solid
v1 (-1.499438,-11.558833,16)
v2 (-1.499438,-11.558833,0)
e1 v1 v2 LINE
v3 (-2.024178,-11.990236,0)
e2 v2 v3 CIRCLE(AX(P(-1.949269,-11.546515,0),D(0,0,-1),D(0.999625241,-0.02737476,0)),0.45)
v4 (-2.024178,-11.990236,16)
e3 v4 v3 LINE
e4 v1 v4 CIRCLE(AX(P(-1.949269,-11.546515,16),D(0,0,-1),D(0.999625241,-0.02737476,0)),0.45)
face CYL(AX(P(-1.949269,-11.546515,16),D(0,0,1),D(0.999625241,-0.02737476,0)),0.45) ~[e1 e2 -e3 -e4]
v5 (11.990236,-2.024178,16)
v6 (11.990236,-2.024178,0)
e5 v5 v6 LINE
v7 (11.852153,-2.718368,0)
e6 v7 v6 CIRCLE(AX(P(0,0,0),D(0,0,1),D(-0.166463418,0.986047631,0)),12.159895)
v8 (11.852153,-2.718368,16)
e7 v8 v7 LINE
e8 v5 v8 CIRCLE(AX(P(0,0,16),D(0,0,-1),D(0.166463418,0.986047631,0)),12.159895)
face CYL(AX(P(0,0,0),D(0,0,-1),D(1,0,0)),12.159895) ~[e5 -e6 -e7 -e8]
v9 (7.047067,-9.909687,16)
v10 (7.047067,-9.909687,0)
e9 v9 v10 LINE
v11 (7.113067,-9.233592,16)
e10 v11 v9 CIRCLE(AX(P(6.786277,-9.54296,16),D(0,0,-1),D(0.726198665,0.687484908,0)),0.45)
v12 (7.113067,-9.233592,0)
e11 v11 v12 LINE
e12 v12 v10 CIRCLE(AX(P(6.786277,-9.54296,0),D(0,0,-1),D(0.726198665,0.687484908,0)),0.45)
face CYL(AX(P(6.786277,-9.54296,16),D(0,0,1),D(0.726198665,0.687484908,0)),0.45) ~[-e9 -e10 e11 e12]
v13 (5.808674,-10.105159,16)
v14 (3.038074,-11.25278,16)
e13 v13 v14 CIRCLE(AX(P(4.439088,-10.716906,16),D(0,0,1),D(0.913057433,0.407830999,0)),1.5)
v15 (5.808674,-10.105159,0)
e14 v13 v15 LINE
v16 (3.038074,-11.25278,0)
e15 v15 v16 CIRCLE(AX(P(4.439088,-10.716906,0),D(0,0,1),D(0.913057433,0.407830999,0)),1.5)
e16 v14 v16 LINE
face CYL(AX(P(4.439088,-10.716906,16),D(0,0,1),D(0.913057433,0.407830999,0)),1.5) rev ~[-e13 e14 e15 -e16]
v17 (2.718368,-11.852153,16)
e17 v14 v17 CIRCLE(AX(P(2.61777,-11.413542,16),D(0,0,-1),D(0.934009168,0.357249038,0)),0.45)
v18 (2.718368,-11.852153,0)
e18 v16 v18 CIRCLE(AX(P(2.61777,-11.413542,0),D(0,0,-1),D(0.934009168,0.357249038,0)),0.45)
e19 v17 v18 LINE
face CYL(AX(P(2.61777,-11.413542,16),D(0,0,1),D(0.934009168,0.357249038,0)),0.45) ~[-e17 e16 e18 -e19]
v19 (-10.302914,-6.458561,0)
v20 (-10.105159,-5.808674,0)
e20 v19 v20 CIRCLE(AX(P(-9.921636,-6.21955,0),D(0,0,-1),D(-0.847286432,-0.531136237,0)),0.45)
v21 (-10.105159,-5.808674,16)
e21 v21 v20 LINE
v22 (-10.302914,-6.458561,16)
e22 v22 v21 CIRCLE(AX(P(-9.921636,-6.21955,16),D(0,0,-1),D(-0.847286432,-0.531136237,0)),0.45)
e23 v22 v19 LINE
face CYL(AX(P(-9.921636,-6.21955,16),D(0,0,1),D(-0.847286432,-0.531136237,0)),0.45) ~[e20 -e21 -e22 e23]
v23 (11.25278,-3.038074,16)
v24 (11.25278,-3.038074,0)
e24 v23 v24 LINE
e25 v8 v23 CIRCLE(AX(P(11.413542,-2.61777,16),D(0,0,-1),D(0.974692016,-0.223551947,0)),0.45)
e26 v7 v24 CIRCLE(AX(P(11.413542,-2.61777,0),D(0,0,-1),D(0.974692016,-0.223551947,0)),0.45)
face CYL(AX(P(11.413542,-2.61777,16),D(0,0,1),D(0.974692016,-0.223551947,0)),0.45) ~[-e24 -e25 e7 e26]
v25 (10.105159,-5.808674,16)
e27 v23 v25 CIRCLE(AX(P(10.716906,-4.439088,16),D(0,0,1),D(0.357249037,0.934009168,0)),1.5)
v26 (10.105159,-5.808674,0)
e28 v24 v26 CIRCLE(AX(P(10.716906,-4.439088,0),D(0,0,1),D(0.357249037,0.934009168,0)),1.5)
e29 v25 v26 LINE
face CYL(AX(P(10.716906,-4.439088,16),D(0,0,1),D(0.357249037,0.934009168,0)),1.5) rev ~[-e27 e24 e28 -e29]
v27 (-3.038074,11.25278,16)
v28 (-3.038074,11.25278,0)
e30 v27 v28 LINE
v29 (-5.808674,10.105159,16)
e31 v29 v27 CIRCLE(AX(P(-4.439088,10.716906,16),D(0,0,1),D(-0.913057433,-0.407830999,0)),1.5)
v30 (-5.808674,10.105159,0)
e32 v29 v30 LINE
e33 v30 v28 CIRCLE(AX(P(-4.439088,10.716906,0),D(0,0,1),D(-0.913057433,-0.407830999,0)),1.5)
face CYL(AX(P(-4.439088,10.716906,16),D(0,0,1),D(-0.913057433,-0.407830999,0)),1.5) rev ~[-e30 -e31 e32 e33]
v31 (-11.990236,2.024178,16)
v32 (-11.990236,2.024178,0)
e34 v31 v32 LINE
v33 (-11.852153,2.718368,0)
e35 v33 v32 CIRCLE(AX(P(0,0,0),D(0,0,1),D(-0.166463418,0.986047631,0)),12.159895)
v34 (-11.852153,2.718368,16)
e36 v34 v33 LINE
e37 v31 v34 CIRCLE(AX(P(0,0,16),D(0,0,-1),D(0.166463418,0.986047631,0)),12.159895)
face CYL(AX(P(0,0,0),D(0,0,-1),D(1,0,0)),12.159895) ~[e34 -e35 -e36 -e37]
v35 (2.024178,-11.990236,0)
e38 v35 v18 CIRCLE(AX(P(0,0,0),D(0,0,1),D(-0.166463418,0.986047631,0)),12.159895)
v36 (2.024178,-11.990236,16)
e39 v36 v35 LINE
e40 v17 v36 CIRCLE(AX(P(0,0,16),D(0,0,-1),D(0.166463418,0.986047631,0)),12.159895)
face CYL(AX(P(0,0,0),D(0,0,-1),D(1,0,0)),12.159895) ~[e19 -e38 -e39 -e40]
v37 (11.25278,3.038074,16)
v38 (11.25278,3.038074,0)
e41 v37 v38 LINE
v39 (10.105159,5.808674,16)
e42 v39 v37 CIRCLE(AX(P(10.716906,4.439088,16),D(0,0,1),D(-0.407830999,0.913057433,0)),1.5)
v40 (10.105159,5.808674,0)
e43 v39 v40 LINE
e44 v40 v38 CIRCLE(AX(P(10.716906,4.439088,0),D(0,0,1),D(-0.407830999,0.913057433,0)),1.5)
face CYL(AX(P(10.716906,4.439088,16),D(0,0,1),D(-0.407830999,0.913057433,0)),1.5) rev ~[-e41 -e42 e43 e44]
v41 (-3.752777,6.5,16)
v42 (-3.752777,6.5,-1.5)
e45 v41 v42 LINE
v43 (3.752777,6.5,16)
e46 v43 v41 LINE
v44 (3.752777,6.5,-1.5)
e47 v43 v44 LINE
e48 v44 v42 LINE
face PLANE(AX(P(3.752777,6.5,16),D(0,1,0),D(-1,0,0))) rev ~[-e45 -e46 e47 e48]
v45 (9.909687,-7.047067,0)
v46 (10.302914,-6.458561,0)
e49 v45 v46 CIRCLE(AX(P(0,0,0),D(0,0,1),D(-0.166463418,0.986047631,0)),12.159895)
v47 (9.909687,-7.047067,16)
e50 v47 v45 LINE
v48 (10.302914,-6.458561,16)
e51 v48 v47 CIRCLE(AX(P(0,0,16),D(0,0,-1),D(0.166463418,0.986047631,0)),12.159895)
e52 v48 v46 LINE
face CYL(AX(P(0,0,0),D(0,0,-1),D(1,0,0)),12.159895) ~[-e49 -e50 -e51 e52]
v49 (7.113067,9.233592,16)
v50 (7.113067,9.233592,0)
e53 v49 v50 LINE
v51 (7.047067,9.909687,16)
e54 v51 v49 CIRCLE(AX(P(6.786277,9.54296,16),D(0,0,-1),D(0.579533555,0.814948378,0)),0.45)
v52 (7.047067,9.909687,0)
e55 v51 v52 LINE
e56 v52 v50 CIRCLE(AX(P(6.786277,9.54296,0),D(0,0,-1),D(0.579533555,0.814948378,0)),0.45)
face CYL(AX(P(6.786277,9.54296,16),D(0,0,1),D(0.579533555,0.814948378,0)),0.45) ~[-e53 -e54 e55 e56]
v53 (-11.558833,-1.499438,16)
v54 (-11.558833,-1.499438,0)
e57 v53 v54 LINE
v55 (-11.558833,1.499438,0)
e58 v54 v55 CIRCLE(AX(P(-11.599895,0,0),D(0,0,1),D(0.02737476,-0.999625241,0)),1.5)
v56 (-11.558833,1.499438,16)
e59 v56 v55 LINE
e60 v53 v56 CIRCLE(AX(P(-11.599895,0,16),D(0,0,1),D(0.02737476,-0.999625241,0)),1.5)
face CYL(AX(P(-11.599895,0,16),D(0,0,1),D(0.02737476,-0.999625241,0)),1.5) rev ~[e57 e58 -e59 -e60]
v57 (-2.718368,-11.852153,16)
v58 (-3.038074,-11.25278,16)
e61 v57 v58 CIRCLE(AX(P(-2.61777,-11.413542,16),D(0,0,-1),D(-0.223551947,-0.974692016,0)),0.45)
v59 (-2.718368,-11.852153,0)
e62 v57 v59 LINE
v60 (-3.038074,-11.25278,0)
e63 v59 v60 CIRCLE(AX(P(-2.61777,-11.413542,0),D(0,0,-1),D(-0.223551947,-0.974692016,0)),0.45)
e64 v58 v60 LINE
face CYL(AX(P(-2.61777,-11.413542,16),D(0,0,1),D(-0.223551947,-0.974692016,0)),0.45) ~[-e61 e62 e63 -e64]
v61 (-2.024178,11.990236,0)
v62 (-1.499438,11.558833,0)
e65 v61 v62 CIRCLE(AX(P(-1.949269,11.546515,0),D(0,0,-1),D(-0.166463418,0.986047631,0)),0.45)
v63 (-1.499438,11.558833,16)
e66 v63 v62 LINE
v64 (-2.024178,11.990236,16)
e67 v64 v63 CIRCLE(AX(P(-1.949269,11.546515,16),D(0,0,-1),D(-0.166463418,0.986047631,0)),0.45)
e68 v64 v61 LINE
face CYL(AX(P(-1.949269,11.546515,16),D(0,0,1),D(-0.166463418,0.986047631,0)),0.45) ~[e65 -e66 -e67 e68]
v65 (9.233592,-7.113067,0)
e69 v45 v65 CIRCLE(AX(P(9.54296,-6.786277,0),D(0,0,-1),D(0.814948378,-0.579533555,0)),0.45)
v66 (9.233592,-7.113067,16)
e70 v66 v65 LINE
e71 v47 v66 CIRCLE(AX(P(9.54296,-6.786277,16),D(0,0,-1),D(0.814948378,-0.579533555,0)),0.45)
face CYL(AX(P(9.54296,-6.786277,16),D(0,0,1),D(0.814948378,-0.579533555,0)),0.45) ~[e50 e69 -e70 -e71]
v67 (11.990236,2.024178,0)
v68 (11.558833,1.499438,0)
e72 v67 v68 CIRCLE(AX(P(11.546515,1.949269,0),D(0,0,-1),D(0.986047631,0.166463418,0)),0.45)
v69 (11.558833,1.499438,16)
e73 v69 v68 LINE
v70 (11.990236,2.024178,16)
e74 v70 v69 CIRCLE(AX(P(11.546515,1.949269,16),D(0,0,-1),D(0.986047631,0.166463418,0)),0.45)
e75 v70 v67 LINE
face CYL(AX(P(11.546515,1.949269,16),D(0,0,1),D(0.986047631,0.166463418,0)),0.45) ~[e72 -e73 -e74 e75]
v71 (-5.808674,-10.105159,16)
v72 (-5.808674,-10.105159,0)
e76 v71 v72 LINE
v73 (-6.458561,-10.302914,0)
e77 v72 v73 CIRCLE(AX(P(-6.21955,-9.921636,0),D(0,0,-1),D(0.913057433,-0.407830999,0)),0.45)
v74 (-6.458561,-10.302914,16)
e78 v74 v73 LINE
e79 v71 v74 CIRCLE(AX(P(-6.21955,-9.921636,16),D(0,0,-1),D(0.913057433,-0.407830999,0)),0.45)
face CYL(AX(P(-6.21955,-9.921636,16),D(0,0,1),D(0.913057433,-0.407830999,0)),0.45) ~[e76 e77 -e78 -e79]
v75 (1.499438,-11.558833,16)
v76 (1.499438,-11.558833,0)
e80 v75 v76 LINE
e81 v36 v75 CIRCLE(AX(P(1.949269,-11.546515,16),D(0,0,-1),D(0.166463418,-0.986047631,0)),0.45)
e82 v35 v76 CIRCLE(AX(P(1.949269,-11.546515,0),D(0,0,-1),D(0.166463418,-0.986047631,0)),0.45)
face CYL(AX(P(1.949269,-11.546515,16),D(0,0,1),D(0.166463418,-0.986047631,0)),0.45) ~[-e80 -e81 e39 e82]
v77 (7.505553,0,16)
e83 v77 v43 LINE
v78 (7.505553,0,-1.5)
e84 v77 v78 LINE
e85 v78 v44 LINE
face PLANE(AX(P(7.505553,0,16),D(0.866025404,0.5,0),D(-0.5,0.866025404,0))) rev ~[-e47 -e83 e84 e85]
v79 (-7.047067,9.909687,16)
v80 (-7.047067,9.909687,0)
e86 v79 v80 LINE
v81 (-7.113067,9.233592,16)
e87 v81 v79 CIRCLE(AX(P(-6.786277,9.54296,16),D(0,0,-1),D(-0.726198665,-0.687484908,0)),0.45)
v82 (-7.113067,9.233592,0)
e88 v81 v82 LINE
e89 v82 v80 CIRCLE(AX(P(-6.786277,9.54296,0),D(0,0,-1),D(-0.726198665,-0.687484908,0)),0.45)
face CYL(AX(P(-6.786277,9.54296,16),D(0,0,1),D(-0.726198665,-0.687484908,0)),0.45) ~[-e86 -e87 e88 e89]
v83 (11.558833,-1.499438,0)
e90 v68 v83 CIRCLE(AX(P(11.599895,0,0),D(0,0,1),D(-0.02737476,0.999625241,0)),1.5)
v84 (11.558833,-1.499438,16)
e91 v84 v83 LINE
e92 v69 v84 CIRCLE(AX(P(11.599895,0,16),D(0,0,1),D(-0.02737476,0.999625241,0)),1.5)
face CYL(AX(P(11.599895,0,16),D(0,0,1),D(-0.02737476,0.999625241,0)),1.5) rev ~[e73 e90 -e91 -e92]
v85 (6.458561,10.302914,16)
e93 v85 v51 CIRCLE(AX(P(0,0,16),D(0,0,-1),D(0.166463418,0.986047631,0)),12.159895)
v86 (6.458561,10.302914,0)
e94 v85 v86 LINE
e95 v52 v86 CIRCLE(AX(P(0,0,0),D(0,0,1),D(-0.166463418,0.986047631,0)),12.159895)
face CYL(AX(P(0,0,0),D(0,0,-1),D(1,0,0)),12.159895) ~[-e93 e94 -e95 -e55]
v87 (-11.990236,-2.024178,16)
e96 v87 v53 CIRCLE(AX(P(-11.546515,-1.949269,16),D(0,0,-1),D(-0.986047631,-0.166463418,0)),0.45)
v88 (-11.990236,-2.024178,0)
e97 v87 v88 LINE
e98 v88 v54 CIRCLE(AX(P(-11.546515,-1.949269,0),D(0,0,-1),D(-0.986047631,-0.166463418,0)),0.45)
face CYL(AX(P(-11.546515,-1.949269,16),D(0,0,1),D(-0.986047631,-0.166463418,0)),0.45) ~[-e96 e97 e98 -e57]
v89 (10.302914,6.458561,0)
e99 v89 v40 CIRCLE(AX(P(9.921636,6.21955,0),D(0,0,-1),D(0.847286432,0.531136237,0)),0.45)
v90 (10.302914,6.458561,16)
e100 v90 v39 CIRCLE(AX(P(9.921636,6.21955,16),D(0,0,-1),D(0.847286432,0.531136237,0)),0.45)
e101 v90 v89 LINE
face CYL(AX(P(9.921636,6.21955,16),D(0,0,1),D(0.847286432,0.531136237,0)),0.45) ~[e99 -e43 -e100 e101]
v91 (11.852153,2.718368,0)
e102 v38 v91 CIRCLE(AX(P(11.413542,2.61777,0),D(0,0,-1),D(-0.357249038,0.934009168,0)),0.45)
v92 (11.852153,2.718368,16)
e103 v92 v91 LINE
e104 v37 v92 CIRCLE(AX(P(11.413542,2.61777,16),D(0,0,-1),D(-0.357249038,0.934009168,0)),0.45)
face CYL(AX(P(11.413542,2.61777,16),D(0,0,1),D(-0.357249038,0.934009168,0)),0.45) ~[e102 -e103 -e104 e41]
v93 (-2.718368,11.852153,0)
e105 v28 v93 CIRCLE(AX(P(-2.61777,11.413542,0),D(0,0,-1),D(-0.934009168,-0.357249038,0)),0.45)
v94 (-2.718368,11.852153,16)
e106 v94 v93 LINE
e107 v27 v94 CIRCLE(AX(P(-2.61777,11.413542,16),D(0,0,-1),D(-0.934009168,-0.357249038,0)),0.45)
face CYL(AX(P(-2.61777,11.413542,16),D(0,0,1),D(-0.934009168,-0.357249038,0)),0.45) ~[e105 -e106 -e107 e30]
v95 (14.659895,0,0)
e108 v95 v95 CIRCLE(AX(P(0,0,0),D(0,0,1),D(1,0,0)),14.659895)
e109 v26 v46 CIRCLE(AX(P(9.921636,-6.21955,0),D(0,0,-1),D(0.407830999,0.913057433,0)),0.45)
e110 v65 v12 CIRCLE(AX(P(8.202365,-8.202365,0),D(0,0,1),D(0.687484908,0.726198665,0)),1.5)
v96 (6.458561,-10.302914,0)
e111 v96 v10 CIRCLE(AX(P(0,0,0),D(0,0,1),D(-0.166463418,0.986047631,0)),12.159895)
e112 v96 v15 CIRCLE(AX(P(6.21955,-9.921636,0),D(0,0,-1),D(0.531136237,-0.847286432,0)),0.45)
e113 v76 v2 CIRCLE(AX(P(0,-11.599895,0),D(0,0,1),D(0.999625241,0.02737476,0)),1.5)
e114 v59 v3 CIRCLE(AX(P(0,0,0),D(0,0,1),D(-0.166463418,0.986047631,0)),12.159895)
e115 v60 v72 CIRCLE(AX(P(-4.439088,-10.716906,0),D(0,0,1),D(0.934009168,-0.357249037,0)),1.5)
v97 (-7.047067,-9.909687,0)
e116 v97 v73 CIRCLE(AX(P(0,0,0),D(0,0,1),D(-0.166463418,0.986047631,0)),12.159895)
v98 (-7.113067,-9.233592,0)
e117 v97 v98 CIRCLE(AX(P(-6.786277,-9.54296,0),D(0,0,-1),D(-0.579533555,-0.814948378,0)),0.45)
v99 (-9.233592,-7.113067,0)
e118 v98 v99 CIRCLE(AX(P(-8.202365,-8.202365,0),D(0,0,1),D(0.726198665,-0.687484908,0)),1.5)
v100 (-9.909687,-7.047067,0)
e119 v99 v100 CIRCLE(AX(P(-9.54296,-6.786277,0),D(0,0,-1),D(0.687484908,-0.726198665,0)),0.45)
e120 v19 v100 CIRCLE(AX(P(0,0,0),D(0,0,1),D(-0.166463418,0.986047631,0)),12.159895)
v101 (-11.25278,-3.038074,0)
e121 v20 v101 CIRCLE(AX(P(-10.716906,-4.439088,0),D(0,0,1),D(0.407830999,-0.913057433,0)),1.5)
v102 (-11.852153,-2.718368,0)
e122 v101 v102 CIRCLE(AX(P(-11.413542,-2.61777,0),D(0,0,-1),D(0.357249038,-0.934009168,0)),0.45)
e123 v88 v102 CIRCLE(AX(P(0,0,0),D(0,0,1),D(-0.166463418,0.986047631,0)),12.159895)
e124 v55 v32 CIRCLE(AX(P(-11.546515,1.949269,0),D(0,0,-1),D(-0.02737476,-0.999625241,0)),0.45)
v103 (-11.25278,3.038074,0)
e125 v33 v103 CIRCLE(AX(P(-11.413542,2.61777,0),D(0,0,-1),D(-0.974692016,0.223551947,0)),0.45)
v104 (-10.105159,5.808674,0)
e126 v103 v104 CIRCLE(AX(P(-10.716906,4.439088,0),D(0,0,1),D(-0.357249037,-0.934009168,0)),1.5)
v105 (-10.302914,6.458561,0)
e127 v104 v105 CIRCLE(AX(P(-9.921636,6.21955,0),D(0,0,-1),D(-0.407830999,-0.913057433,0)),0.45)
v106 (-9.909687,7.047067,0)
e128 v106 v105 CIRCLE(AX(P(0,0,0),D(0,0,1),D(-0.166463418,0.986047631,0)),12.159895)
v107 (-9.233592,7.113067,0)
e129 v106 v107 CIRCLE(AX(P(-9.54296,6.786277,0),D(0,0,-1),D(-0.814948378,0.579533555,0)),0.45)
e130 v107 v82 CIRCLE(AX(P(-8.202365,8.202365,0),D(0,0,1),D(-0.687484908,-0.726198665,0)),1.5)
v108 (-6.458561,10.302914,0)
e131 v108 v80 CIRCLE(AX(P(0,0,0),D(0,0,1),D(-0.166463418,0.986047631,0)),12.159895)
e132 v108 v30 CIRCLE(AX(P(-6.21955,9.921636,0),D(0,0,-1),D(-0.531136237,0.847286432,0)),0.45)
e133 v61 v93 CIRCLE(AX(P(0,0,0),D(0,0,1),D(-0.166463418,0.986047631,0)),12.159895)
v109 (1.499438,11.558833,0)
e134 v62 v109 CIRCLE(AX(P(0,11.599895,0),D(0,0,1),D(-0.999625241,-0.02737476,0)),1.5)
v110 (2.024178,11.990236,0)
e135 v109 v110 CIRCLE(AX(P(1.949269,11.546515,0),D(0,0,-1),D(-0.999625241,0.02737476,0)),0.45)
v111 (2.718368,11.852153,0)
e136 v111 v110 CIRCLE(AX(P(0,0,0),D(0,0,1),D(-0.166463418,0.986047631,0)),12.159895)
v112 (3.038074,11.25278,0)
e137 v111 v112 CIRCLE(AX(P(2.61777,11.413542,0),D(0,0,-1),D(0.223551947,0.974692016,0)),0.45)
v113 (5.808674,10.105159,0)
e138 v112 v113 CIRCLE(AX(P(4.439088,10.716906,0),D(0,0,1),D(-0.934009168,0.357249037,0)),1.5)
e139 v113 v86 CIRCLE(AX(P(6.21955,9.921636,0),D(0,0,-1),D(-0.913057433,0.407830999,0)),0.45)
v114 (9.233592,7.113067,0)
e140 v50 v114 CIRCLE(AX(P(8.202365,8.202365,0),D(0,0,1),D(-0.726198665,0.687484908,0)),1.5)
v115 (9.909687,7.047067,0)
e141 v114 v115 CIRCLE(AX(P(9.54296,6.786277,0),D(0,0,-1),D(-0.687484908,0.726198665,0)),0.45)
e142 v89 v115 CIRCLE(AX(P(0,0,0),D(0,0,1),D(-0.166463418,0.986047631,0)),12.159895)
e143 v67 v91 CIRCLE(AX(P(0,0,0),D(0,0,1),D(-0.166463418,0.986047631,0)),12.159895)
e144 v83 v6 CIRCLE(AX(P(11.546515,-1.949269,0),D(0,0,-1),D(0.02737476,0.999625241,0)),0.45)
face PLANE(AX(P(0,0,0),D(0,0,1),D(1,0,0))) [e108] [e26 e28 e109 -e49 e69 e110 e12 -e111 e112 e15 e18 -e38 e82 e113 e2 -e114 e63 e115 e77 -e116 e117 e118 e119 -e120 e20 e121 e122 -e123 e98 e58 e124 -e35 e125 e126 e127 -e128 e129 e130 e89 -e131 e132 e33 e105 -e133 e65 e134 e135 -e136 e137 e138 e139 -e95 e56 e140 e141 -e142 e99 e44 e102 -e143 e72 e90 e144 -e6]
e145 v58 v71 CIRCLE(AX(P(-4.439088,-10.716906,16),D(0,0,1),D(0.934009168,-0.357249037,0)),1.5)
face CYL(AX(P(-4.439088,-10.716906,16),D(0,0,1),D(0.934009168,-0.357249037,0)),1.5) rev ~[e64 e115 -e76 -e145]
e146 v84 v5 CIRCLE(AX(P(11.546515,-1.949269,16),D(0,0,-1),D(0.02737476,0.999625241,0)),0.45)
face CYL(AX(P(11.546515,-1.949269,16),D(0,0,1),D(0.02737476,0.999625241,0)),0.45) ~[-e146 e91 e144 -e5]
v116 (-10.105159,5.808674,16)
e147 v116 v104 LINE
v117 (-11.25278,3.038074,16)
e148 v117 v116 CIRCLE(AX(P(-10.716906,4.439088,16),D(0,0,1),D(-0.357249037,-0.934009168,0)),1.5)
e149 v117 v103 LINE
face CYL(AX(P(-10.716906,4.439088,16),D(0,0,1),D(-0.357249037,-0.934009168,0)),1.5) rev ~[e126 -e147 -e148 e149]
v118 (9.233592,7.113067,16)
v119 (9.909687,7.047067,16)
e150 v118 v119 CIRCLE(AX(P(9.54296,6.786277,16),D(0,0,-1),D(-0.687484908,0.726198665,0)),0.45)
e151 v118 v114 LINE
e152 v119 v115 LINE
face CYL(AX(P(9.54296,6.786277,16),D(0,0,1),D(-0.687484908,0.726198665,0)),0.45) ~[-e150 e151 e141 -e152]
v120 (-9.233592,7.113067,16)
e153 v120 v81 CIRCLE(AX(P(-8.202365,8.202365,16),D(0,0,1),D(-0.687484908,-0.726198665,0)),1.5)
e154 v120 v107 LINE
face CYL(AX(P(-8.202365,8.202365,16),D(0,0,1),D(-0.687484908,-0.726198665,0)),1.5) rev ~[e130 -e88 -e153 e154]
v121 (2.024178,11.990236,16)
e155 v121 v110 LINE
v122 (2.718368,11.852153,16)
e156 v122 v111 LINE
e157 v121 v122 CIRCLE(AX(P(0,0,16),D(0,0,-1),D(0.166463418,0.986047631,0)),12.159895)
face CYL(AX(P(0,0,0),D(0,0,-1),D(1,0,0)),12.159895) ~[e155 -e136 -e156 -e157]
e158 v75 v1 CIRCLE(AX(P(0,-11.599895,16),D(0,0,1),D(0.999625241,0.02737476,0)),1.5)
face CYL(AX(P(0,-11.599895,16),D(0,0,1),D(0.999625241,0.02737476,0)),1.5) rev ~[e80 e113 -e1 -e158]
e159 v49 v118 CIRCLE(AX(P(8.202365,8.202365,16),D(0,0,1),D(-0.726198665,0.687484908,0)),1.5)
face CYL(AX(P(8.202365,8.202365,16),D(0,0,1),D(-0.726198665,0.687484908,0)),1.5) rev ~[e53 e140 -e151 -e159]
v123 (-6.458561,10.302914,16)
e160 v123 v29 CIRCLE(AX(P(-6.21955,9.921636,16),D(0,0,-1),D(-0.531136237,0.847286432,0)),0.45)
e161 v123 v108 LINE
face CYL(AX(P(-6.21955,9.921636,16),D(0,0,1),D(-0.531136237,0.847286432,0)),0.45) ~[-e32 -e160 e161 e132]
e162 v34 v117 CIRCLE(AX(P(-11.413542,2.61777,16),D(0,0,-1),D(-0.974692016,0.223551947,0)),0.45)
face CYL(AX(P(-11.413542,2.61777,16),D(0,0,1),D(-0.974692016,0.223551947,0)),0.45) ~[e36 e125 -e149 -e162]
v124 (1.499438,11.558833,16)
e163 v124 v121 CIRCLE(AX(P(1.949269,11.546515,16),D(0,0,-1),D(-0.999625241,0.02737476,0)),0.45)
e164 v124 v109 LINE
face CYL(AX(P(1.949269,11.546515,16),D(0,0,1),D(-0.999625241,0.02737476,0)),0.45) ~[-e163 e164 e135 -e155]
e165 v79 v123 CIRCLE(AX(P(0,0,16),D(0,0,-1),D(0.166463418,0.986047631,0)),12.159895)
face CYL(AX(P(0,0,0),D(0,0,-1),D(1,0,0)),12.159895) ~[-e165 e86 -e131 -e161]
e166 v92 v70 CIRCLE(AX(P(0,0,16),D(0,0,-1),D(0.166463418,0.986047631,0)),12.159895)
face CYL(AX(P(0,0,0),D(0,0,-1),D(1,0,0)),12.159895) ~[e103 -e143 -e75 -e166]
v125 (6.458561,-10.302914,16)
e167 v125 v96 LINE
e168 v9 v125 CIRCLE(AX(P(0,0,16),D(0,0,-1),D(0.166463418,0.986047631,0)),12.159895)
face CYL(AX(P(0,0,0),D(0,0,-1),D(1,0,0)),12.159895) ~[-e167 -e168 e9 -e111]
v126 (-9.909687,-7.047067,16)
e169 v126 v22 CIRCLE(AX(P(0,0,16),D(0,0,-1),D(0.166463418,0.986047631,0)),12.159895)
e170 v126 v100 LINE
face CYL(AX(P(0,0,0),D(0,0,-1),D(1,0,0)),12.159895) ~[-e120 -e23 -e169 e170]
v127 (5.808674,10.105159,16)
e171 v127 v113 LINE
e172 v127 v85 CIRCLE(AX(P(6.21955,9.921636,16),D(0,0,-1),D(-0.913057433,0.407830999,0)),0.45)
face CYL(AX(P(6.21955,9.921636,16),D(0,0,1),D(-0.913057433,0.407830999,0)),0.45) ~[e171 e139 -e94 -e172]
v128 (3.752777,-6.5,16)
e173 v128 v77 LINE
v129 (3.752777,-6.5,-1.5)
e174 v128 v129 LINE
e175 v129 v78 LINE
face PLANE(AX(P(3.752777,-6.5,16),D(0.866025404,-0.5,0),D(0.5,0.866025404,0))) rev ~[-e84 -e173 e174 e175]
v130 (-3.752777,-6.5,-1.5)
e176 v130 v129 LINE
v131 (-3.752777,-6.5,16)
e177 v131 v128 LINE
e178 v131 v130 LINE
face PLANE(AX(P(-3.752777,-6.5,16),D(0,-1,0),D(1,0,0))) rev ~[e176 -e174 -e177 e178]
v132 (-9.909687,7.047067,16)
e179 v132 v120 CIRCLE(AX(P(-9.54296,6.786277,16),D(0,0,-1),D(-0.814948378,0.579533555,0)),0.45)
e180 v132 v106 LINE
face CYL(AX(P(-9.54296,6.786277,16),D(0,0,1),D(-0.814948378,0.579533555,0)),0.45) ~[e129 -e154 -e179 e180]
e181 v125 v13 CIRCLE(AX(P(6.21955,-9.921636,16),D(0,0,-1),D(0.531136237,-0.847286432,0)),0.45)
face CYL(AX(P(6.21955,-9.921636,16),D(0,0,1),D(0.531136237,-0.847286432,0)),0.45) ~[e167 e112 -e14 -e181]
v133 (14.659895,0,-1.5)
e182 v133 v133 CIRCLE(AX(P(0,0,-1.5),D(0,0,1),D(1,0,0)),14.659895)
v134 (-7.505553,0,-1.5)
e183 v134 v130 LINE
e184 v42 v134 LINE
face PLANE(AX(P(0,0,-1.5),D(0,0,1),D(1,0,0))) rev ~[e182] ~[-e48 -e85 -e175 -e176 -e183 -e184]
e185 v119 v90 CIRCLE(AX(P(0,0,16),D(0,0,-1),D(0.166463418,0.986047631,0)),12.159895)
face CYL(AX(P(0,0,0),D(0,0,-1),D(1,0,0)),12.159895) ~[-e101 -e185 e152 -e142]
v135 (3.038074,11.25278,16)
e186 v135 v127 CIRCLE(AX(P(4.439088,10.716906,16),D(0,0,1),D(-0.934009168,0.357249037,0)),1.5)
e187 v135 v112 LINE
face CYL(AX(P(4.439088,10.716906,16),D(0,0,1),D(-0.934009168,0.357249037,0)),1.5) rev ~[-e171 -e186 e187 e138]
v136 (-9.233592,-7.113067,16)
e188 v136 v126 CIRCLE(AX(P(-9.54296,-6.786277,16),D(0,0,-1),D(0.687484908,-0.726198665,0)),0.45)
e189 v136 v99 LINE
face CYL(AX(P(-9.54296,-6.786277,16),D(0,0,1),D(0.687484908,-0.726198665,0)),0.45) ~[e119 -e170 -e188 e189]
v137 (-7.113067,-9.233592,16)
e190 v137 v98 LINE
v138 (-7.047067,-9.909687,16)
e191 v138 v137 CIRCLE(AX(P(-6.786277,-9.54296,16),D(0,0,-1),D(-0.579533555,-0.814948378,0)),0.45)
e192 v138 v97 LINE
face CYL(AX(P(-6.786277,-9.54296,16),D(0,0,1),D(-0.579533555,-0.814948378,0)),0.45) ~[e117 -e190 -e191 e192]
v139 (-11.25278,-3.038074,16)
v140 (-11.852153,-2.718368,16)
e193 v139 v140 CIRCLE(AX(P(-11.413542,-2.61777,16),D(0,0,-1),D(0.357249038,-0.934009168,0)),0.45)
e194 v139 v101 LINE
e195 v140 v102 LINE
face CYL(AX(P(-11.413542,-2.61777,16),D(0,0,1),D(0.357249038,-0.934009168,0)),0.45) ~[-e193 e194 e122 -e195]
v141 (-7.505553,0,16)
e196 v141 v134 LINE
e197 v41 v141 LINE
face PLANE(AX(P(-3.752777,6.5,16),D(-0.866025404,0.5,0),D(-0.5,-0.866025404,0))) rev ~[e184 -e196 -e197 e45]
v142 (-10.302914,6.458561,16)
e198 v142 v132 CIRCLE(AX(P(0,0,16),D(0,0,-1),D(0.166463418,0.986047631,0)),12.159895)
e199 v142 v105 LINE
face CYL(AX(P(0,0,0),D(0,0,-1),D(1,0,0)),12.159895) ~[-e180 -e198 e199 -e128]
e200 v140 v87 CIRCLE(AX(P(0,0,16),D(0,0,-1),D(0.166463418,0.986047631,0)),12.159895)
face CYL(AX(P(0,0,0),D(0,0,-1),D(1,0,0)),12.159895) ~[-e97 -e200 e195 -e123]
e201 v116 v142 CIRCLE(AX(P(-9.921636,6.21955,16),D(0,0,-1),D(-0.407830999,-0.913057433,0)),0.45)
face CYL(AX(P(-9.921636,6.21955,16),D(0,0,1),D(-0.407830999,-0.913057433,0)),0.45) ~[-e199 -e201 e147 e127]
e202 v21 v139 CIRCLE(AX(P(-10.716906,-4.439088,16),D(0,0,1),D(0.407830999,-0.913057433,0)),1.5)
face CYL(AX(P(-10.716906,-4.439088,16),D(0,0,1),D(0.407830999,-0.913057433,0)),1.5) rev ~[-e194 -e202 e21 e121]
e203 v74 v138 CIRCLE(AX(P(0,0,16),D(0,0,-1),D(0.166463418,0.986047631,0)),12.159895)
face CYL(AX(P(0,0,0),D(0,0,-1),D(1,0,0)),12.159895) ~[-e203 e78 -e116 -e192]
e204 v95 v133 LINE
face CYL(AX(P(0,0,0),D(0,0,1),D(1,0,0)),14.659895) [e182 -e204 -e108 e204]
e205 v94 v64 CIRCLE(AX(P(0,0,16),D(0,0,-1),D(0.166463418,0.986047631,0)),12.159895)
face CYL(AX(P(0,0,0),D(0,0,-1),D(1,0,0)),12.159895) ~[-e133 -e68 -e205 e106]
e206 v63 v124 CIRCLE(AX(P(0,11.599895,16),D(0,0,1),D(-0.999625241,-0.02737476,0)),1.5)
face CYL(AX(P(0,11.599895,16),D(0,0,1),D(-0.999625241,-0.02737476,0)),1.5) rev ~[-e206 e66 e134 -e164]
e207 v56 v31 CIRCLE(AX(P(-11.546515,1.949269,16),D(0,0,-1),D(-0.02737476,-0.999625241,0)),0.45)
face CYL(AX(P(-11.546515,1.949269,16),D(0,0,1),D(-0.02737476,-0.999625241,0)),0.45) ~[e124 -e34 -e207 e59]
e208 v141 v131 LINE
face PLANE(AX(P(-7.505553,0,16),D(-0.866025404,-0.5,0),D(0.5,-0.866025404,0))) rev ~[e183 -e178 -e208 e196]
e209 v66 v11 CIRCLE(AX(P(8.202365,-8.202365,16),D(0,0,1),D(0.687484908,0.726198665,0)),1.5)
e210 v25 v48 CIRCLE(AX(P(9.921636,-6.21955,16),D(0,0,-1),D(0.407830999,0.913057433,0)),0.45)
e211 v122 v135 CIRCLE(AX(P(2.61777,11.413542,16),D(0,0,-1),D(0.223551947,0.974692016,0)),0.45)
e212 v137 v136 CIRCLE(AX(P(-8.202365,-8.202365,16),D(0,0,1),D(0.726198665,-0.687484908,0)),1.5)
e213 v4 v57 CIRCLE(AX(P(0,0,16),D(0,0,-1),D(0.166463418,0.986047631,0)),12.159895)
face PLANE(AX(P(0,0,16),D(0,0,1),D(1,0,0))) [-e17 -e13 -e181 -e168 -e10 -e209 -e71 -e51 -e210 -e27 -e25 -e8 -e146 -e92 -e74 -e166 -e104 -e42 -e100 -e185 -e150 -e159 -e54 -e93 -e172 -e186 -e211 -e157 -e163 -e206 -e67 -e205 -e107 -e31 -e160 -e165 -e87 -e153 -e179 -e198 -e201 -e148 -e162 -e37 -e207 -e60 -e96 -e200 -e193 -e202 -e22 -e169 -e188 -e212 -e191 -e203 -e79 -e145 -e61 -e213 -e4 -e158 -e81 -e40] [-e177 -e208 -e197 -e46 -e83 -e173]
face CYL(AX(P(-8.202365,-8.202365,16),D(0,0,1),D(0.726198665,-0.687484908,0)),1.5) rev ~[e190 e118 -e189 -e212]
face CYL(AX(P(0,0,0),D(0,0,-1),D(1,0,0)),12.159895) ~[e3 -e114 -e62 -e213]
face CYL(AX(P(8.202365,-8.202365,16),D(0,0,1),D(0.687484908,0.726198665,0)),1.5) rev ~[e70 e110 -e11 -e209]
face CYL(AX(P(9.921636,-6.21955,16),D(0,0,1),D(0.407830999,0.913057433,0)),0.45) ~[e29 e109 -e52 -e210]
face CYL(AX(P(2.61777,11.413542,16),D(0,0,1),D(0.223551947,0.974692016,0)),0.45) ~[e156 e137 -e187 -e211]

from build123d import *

# Parameters (mm, degrees)
F2_R            = 12.1598954619
F3_DEPTH        = 16
F5_DEPTH        = 16
F5_COPIES_COUNT = 16
F8_R            = 14.6598954619
F8_R_2          = 12.1598954619
F9_DEPTH        = 1.5
F10_DEPTH       = 17.501


# Not quite as in the source:
# - a feature of the source that left no trace in its solid (it failed there, or was rolled back) is left out
# - a pattern or mirror of a feature is missing from the dataset's text; its kind, count and spacing are read off the source's solid


with BuildPart() as f3:
    # F2 (on Top) → F3 (new body)
    with BuildSketch(Plane.XY):
        Circle(F2_R)
    extrude(amount=F3_DEPTH)

    # F4 (on face) → F5 (cut, through all)
    with BuildSketch(Plane.XY.offset(16)):
        with BuildLine():
            ThreePointArc((-2.024177758, 11.9902361131), (-1.6634915573, 11.8941223999), (-1.4994378615, 11.5588333213))
            ThreePointArc((-1.4994378615, 11.5588333213), (0, 10.0998954619), (1.4994378615, 11.5588333213))
            ThreePointArc((1.4994378615, 11.5588333213), (1.6634915573, 11.8941223999), (2.024177758, 11.9902361131))
            ThreePointArc((2.024177758, 11.9902361131), (0, 12.1598954619), (-2.024177758, 11.9902361131))
        make_face()
    f5 = extrude(amount=-F5_DEPTH, mode=Mode.SUBTRACT)

    # F5_copies: F5 ×16 about axis
    f5_copies_axis = Axis((0, 0, 0), (0, 0, 1))
    for i in range(1, F5_COPIES_COUNT):
        add(f5.rotate(f5_copies_axis, i * 360 / F5_COPIES_COUNT), mode=Mode.SUBTRACT)

    # F8 (on face) + F2 (on Top) → F9 (join)
    with BuildSketch(Plane.XY):
        Circle(F8_R)
        Circle(F8_R_2, mode=Mode.SUBTRACT)
    with BuildSketch(Plane.XY):
        Circle(F2_R)
    extrude(amount=-F9_DEPTH)

    # F7 (on face) → F10 (cut, through all)
    with BuildSketch(Plane.XY.offset(16)):
        Polygon((3.7527767497, 6.5), (-3.7527767497, 6.5), (-7.5055534995, 0), (-3.7527767497, -6.5), (3.7527767497, -6.5), (7.5055534995, 0), align=None)
    extrude(amount=-F10_DEPTH, mode=Mode.SUBTRACT)


solid = f3.part
